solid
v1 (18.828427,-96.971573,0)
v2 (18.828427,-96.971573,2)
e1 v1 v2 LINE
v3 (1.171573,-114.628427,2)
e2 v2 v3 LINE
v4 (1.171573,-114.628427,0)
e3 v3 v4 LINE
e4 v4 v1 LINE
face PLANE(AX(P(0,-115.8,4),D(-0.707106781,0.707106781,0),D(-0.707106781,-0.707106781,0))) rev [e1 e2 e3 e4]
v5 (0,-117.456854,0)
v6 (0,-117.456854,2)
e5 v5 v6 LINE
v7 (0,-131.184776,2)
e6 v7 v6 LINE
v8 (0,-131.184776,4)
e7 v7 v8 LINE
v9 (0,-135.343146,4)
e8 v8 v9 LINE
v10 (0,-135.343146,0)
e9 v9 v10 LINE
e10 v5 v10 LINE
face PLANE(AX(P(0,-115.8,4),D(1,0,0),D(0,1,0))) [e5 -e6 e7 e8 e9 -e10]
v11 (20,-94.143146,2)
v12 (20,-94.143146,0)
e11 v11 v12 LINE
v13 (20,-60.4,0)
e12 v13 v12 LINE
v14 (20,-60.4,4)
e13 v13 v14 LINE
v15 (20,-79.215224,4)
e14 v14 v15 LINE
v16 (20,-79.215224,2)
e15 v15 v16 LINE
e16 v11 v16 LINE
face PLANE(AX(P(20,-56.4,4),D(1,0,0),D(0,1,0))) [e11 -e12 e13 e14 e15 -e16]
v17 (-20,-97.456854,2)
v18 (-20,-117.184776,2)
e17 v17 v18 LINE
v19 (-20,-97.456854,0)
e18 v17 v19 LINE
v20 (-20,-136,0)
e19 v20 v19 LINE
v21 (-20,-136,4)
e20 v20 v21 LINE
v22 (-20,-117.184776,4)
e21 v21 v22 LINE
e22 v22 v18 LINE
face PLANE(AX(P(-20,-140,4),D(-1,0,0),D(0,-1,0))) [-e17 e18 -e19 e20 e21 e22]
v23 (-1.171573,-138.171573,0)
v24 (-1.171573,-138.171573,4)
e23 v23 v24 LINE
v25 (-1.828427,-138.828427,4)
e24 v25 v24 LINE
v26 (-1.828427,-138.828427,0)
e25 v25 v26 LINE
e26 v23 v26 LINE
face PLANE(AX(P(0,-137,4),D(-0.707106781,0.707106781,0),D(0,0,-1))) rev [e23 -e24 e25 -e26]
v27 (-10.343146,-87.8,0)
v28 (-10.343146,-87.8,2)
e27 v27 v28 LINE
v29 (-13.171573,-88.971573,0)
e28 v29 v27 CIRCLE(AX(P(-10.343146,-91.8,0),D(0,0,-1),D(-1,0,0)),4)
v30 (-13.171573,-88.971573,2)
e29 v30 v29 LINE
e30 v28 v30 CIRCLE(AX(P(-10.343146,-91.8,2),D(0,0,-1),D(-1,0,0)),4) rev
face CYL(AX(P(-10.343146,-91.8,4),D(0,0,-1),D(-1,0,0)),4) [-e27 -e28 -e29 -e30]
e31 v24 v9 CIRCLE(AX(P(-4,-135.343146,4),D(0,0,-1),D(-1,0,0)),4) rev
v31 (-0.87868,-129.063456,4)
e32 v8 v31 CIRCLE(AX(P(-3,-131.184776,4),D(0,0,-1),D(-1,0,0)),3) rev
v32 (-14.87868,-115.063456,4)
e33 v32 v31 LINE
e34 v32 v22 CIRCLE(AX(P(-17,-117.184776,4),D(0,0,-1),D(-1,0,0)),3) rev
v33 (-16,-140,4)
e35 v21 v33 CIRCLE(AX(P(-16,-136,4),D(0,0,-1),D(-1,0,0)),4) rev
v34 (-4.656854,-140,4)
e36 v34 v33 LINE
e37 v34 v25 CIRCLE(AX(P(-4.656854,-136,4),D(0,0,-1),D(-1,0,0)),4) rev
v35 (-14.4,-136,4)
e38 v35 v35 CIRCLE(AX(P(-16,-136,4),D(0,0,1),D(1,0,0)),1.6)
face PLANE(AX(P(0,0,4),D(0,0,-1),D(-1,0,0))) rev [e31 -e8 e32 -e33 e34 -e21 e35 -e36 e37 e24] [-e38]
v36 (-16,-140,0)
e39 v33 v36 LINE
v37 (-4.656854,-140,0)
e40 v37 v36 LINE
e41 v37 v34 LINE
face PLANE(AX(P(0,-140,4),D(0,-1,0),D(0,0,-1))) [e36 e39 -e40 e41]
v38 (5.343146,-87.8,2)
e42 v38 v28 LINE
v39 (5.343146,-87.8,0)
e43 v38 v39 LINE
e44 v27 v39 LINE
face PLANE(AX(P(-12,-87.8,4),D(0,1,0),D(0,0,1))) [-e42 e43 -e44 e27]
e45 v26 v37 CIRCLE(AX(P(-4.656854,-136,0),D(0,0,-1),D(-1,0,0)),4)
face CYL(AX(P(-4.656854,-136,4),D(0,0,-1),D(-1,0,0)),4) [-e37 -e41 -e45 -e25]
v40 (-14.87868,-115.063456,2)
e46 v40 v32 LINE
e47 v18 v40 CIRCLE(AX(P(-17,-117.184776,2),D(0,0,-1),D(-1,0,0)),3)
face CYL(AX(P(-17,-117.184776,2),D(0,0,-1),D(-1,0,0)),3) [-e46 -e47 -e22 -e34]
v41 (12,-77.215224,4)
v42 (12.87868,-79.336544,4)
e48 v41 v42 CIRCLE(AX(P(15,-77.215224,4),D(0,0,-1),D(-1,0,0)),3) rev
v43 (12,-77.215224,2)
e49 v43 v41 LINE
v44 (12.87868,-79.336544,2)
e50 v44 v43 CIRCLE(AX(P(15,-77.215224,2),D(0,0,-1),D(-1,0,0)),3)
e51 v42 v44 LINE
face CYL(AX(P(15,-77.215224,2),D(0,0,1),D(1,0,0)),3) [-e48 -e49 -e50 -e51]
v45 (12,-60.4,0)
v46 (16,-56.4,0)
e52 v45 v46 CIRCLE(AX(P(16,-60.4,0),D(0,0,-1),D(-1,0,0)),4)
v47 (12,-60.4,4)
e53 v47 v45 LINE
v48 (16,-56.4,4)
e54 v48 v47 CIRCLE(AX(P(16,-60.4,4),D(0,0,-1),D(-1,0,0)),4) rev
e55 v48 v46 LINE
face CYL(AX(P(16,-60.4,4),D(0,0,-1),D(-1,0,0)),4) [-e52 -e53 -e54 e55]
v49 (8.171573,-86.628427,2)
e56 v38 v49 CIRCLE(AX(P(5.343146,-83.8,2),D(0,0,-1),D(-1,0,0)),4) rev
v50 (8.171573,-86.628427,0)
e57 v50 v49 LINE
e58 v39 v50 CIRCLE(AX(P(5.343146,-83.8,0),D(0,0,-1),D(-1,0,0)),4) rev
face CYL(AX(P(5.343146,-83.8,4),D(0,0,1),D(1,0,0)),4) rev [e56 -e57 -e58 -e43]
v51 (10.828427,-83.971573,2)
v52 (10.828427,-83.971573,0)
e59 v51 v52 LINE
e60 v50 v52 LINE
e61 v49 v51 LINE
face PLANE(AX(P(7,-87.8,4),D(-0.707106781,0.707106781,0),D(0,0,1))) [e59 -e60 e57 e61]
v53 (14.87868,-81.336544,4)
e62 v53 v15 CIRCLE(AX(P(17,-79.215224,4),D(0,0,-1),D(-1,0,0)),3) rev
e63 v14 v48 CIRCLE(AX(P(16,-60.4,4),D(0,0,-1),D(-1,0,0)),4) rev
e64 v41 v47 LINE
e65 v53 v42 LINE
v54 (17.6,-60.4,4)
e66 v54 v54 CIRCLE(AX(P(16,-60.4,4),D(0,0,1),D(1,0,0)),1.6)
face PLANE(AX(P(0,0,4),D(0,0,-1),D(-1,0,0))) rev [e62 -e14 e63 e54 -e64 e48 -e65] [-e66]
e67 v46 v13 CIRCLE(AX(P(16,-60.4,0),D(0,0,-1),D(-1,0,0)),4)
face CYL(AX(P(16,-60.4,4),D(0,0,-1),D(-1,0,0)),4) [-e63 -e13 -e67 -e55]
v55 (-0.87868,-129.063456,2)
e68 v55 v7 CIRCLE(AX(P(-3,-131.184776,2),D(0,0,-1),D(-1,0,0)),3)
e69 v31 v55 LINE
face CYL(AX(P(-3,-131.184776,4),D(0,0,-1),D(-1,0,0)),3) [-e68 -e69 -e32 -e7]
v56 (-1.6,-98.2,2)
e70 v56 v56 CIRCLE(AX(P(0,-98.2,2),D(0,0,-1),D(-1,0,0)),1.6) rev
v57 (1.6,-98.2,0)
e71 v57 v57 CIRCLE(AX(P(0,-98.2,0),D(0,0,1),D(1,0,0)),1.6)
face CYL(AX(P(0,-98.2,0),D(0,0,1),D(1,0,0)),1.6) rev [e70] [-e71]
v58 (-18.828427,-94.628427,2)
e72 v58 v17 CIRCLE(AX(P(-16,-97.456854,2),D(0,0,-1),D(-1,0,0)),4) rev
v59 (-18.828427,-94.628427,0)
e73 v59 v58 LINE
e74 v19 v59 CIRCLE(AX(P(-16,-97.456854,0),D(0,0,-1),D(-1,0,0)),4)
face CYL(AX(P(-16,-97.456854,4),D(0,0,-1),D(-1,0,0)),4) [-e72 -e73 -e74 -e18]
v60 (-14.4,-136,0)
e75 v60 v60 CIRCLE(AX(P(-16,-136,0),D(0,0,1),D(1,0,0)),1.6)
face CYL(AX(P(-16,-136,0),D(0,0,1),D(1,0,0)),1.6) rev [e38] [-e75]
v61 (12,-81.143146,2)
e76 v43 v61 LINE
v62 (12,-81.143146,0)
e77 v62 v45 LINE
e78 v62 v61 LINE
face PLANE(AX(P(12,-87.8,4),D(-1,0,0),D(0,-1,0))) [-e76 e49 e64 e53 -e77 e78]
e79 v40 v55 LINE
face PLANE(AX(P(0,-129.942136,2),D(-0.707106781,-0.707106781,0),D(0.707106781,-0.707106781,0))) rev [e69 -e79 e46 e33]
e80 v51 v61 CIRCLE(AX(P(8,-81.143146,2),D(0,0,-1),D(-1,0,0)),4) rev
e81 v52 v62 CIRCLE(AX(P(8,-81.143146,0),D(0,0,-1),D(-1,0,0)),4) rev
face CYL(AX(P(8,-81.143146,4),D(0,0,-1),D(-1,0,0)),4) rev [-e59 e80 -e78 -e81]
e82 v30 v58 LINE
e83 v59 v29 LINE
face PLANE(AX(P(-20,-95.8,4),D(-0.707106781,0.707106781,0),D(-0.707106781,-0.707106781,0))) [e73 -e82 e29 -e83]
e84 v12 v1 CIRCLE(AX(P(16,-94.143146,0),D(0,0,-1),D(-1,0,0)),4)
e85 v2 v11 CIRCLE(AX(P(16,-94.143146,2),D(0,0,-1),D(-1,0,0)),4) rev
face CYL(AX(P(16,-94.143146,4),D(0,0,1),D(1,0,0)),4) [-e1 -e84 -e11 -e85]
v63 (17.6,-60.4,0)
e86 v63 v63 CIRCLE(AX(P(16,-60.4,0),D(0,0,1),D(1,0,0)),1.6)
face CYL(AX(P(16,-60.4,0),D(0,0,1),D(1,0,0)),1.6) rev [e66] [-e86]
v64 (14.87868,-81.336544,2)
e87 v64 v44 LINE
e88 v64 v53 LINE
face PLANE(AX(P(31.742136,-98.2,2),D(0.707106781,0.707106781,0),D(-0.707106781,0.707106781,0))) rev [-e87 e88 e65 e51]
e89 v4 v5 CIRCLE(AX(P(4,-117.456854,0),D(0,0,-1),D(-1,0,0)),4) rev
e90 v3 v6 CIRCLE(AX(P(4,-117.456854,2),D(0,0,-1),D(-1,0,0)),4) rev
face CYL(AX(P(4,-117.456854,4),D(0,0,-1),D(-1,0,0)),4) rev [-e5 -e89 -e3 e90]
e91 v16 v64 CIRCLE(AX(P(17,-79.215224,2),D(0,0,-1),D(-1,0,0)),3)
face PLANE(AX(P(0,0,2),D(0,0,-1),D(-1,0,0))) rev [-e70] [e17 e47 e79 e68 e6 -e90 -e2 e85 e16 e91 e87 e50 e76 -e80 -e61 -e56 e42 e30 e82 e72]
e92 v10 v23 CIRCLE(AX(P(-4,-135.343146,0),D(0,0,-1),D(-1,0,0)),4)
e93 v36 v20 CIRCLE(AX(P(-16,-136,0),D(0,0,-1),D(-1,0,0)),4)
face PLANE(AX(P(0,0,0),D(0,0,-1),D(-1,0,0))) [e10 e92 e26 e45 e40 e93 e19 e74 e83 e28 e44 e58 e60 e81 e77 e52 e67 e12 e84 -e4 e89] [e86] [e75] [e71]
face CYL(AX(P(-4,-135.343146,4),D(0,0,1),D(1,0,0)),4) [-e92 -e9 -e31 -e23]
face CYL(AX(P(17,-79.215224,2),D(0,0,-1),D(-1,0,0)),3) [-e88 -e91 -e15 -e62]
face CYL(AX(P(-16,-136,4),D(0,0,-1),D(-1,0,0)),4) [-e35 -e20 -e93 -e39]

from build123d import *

# Parameters (mm, degrees)
BOSS_EXTRUDE1_DEPTH = 4
FILLET1_R           = 4
CHAMFER1_SIZE       = 3
CHAMFER2_SIZE       = 5
FILLET2_R           = 4
SKETCH2_R           = 1.6
CUT_EXTRUDE1_DEPTH  = 142.477913471
CUT_EXTRUDE2_DEPTH  = 2
FILLET3_R           = 3
SKETCH4_R           = 1.6
CUT_EXTRUDE3_DEPTH  = 142.477913471


with BuildPart() as part:
    # Sketch1 → Boss-Extrude1 (new body)
    with BuildSketch(Plane.XY):
        Polygon((-12, -87.8), (12, -87.8), (12, -56.4), (20, -56.4), (20, -95.8), (0, -115.8), (0, -140), (-20, -140), (-20, -95.8), align=None)
    extrude(amount=BOSS_EXTRUDE1_DEPTH)

    # Fillet1
    fillet1_edges = [part.edges().sort_by_distance(p)[0] for p in [
        (12, -56.4, 2),
        (20, -56.4, 2),
        (-20, -140, 2),
    ]]
    fillet(fillet1_edges, radius=FILLET1_R - 0.0001)  # a hair under: the kernel refuses the full size

    # Chamfer1
    chamfer1_edges = [part.edges().sort_by_distance(p)[0] for p in [
        (0, -140, 2),
    ]]
    chamfer(chamfer1_edges, length=CHAMFER1_SIZE)

    # Chamfer2
    chamfer2_edges = [part.edges().sort_by_distance(p)[0] for p in [
        (12, -87.8, 2),
    ]]
    chamfer(chamfer2_edges, length=CHAMFER2_SIZE)

    # Fillet2
    fillet2_edges = [part.edges().sort_by_distance(p)[0] for p in [
        (0, -115.8, 2),
        (20, -95.8, 2),
        (-12, -87.8, 2),
        (-20, -95.8, 2),
        (0, -137, 2),
        (-3, -140, 2),
        (7, -87.8, 2),
        (12, -82.8, 2),
    ]]
    fillet(fillet2_edges, radius=FILLET2_R)

    # Sketch2 → Cut-Extrude1 (cut, through all)
    with BuildSketch(Plane.XY.offset(4)):
        with Locations((0, -98.2)):
            Circle(SKETCH2_R)
    extrude(amount=-CUT_EXTRUDE1_DEPTH, mode=Mode.SUBTRACT)

    # Sketch3 → Cut-Extrude2 (cut)
    with BuildSketch(Plane.XY.offset(4)):
        Polygon((0, -129.942135624), (31.742135624, -98.2), (0, -66.457864376), (-31.742135624, -98.2), align=None)
    extrude(amount=-CUT_EXTRUDE2_DEPTH, mode=Mode.SUBTRACT)

    # Fillet3
    fillet3_edges = [part.edges().sort_by_distance(p)[0] for p in [
        (-20, -109.942135624, 3),
        (20, -86.457864376, 3),
        (12, -78.457864376, 3),
        (0, -129.942135624, 3),
    ]]
    fillet(fillet3_edges, radius=FILLET3_R)

    # Sketch4 → Cut-Extrude3 (cut, through all)
    with BuildSketch(Plane.XY.offset(4)):
        with Locations((-16, -136)):
            Circle(SKETCH4_R)
        with Locations((16, -60.4)):
            Circle(SKETCH4_R)
    extrude(amount=-CUT_EXTRUDE3_DEPTH, mode=Mode.SUBTRACT)


solid = part.part
